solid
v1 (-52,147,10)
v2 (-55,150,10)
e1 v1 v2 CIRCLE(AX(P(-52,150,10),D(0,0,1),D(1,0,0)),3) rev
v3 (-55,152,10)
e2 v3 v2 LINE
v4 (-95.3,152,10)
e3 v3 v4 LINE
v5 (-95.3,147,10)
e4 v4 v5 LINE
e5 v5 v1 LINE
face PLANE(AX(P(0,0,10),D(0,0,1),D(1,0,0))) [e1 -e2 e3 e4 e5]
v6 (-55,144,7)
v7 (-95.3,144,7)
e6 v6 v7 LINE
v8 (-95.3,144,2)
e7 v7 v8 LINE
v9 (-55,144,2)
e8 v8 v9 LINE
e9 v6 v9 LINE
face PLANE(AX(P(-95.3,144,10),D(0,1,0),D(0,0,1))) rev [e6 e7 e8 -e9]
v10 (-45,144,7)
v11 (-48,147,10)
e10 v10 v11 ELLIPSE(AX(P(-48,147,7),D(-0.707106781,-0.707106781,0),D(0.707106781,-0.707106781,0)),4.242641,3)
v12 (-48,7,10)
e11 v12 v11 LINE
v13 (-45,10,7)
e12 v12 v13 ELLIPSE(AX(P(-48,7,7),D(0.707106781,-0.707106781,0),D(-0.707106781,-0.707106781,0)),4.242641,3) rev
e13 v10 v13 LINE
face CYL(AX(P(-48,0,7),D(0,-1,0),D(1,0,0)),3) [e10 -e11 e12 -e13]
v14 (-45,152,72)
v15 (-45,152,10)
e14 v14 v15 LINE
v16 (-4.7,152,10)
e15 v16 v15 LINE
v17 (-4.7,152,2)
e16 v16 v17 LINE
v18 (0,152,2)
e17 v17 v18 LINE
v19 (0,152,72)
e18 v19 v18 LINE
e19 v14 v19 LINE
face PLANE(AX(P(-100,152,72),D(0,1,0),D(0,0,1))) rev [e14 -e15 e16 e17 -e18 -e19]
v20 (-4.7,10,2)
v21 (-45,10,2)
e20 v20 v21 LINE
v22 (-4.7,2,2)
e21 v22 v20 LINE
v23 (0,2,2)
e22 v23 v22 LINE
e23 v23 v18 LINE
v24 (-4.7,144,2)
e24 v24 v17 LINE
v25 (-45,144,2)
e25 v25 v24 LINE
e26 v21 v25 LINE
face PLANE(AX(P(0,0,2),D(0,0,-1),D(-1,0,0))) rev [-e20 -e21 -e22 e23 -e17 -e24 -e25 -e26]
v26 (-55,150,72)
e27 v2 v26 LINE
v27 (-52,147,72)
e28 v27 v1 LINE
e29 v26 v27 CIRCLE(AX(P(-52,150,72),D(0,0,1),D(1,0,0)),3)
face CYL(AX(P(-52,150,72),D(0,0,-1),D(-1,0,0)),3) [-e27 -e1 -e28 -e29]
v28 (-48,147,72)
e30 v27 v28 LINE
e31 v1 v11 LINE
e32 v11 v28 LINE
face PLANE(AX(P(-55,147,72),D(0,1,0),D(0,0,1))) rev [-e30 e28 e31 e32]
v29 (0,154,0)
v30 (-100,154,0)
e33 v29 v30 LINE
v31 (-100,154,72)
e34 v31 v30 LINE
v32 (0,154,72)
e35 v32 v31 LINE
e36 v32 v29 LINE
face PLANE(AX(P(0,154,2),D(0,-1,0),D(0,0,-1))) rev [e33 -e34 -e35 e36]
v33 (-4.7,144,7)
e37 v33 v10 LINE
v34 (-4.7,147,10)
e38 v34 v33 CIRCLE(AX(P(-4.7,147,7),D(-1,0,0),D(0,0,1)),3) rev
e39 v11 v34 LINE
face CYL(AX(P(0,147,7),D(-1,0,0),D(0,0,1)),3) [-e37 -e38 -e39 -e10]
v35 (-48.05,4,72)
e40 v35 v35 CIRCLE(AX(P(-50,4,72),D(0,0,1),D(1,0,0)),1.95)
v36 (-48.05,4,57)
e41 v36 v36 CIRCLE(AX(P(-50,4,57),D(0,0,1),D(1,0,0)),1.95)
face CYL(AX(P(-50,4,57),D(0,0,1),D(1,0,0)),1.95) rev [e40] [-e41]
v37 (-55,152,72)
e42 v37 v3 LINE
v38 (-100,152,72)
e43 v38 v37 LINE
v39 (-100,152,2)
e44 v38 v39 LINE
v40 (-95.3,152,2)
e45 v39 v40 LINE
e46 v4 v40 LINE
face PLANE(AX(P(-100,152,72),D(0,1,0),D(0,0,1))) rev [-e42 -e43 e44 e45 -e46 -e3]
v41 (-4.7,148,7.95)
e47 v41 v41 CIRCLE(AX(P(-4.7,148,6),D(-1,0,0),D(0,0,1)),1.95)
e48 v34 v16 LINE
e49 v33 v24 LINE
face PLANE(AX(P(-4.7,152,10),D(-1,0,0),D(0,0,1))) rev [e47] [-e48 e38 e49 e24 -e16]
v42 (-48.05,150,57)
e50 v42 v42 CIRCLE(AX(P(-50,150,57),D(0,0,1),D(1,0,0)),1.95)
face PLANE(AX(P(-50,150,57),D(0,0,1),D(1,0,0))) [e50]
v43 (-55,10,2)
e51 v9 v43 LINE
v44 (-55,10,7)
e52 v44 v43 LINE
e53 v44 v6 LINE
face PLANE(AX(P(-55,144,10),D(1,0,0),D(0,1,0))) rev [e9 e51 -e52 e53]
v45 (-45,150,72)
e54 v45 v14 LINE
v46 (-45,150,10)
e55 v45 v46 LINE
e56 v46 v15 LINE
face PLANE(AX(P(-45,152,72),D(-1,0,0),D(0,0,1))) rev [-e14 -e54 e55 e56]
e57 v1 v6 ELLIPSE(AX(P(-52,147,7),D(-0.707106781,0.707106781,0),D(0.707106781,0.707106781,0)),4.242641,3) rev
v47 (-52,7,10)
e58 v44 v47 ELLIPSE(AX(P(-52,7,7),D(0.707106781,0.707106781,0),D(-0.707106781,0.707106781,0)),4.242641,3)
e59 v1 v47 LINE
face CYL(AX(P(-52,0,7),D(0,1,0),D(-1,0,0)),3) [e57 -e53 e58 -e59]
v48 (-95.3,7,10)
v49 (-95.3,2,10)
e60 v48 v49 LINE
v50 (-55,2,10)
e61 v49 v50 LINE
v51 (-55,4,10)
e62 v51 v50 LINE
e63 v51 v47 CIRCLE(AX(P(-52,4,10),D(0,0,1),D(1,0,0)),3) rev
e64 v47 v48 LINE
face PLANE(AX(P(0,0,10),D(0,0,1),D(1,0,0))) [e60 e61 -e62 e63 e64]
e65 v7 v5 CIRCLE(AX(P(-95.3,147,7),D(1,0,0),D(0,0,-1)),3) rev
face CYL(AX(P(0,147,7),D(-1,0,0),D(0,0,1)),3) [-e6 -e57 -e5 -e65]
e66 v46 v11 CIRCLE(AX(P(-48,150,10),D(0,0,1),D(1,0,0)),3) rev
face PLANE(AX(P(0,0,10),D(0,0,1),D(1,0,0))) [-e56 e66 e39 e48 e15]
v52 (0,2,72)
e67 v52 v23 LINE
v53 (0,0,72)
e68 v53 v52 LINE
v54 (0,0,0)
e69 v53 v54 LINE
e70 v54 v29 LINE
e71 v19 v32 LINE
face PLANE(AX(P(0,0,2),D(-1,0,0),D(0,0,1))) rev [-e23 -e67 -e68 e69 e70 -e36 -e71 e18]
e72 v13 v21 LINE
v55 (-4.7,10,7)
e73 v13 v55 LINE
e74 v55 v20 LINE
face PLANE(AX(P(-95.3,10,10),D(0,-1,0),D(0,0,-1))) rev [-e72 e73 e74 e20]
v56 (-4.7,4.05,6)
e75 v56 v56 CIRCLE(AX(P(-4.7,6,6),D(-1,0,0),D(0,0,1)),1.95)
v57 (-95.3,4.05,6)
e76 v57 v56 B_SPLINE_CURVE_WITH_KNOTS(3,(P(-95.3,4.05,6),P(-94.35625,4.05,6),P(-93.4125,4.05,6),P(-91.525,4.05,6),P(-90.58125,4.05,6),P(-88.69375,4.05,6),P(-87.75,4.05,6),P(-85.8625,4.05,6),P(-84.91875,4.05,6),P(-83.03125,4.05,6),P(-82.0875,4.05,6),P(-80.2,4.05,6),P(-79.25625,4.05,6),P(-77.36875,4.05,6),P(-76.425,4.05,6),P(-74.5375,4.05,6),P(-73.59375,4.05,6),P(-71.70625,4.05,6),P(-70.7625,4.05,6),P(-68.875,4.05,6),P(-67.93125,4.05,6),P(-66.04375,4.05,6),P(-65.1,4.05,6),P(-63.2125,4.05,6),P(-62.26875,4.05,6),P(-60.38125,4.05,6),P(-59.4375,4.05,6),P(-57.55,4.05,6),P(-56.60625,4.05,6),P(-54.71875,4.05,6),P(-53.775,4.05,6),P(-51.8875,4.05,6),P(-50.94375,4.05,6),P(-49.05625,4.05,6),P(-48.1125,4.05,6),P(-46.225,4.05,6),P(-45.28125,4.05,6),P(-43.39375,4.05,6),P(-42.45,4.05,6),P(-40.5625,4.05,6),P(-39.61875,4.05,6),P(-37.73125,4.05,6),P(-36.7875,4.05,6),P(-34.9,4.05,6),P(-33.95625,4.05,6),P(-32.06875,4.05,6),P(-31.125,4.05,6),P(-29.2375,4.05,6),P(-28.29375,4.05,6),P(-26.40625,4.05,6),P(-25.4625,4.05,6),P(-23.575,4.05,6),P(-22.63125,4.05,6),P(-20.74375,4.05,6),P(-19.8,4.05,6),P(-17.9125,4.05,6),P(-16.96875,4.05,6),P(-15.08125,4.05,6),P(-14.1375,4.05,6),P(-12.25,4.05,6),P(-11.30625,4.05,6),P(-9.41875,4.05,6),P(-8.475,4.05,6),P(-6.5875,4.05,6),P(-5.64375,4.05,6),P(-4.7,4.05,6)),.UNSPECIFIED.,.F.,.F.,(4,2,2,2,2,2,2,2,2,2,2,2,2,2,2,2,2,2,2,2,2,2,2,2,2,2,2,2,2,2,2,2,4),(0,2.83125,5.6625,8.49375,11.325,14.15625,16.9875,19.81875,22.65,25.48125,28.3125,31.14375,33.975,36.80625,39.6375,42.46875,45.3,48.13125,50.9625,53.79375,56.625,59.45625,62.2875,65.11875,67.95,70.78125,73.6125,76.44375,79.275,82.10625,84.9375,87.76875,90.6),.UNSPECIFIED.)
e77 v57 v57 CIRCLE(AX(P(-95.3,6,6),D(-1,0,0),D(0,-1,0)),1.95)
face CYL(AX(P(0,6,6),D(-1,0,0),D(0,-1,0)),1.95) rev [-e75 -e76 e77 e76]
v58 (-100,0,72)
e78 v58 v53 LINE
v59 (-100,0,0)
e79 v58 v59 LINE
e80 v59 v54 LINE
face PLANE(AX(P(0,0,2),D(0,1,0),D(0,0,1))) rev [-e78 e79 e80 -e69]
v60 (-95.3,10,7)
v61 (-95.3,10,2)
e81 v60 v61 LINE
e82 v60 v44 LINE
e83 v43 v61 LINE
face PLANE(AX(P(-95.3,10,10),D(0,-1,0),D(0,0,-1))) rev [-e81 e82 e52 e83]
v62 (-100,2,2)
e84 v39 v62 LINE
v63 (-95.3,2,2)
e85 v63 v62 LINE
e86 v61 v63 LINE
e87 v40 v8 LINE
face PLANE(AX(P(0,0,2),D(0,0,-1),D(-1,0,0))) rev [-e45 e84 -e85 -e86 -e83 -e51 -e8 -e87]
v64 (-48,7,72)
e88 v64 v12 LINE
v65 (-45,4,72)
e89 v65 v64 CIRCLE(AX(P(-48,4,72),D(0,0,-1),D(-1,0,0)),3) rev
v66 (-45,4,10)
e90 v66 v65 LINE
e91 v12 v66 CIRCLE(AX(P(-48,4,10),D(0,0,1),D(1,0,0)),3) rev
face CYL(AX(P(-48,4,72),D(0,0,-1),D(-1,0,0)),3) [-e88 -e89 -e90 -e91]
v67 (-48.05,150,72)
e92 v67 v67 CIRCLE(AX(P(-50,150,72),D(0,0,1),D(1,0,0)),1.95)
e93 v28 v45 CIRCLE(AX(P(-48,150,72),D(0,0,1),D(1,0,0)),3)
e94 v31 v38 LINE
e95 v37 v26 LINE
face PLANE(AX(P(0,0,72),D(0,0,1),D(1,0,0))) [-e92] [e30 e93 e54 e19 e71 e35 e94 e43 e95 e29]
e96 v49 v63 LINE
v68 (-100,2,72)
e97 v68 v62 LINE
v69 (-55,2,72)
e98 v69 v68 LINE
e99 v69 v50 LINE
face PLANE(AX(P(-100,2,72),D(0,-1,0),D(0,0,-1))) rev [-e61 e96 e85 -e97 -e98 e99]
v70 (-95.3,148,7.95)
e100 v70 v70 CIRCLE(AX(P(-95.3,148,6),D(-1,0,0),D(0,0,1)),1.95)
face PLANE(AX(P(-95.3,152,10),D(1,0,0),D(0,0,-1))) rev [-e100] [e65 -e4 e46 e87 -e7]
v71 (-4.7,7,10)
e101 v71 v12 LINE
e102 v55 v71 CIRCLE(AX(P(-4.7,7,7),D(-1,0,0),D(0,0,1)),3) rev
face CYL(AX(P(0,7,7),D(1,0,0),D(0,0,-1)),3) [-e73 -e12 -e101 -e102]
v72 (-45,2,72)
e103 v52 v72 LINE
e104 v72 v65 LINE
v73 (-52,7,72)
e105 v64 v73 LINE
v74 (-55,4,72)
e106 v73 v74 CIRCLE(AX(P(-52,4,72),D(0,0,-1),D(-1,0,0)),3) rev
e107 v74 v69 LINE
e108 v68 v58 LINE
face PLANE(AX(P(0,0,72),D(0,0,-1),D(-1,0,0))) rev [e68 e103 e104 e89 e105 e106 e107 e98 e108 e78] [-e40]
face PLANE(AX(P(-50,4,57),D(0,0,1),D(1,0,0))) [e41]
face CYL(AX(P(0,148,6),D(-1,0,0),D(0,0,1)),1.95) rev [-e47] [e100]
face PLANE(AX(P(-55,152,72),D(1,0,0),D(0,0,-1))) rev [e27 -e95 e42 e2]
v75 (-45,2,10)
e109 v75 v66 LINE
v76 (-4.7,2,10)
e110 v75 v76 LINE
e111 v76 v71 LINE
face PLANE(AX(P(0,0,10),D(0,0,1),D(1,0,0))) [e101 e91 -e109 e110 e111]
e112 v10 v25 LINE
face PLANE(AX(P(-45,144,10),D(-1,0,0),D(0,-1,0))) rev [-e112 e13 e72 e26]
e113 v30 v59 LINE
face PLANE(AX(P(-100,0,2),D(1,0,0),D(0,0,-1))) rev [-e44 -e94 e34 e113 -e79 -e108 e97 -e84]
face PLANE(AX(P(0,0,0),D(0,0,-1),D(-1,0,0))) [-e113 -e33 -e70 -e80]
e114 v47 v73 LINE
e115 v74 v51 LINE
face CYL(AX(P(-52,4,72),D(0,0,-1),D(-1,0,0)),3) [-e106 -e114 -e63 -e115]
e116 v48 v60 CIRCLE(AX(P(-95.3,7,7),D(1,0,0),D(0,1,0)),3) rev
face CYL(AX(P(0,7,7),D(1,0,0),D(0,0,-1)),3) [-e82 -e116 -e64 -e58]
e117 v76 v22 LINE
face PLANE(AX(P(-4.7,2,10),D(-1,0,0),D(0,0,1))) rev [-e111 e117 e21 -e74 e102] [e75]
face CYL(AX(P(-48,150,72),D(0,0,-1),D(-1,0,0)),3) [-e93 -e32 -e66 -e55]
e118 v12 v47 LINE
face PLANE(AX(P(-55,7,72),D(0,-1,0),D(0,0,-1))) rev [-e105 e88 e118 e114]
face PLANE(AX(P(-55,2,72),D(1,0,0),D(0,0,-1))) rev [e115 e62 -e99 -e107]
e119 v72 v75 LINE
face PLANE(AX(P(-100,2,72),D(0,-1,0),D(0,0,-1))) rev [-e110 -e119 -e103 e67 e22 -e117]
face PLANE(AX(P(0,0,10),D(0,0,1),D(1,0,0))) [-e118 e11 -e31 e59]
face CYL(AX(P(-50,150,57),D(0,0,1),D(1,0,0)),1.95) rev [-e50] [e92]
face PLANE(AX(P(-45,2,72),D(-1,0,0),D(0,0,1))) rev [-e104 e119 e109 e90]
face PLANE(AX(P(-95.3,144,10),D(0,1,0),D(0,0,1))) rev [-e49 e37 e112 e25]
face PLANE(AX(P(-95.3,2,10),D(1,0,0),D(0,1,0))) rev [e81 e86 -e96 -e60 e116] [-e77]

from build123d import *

# Parameters (mm, degrees)
SKETCH1_W           = 154
SKETCH1_H           = 100
BOSS_EXTRUDE1_DEPTH = 2
SKETCH2_W           = 100
SKETCH2_H           = 2
BOSS_EXTRUDE2_DEPTH = 70
SKETCH3_W           = 90.6
SKETCH3_H           = 8
BOSS_EXTRUDE3_DEPTH = 8
SKETCH4_W           = 10
SKETCH4_H           = 134
BOSS_EXTRUDE4_DEPTH = 8
SKETCH5_W           = 10
SKETCH5_H           = 5
BOSS_EXTRUDE5_DEPTH = 62
SKETCH6_R           = 1.95
CUT_EXTRUDE1_DEPTH  = 195.889943301
SKETCH7_R           = 1.95
CUT_EXTRUDE2_DEPTH  = 195.889943301
FILLET1_R           = 3
SKETCH8_R           = 1.95
CUT_EXTRUDE3_DEPTH  = 15
SKETCH9_R           = 1.95
CUT_EXTRUDE4_DEPTH  = 15
FILLET2_R           = 3


with BuildPart() as part:
    # Sketch1 → Boss-Extrude1 (new body)
    with BuildSketch(Plane(origin=(0, 0, 0), x_dir=(0, 1, 0), z_dir=(0, 0, 1))):
        with Locations((77, 50)):
            Rectangle(SKETCH1_W, SKETCH1_H)
    extrude(amount=BOSS_EXTRUDE1_DEPTH)

    # Sketch2 → Boss-Extrude2 (add)
    with BuildSketch(Plane.XY.offset(2)):
        with Locations((-50, 153)):
            Rectangle(SKETCH2_W, SKETCH2_H)
        with Locations((-50, 1)):
            Rectangle(SKETCH2_W, SKETCH2_H)
    extrude(amount=BOSS_EXTRUDE2_DEPTH)

    # Sketch3 → Boss-Extrude3 (add)
    with BuildSketch(Plane.XY.offset(2)):
        with Locations((-50, 148)):
            Rectangle(SKETCH3_W, SKETCH3_H)
        with Locations((-50, 6)):
            Rectangle(SKETCH3_W, SKETCH3_H)
    extrude(amount=BOSS_EXTRUDE3_DEPTH)

    # Sketch4 → Boss-Extrude4 (add)
    with BuildSketch(Plane.XY.offset(2)):
        with Locations((-50, 77)):
            Rectangle(SKETCH4_W, SKETCH4_H)
    extrude(amount=BOSS_EXTRUDE4_DEPTH)

    # Sketch5 → Boss-Extrude5 (add)
    with BuildSketch(Plane.XY.offset(10)):
        with Locations((-50, 149.5)):
            Rectangle(SKETCH5_W, SKETCH5_H)
        with Locations((-50, 4.5)):
            Rectangle(SKETCH5_W, SKETCH5_H)
    extrude(amount=BOSS_EXTRUDE5_DEPTH)

    # Sketch6 → Cut-Extrude1 (cut, through all)
    with BuildSketch(Plane(origin=(-95.3, 0, 0), x_dir=(0, -1, 0), z_dir=(-1, 0, 0))):
        with Locations((-6, 6)):
            Circle(SKETCH6_R)
    extrude(amount=-CUT_EXTRUDE1_DEPTH, mode=Mode.SUBTRACT)

    # Sketch7 → Cut-Extrude2 (cut, through all)
    with BuildSketch(Plane(origin=(-95.3, 0, 0), x_dir=(0, -1, 0), z_dir=(-1, 0, 0))):
        with Locations(Location((-148, 6, 0), (0, 0, 90))):
            Circle(SKETCH7_R)
    extrude(amount=-CUT_EXTRUDE2_DEPTH, mode=Mode.SUBTRACT)

    # Fillet1
    fillet1_edges = [part.edges().sort_by_distance(p)[0] for p in [
        (-75.15, 144, 10),
        (-24.85, 10, 10),
        (-75.15, 10, 10),
        (-24.85, 144, 10),
        (-55, 77, 10),
        (-45, 77, 10),
    ]]
    fillet(fillet1_edges, radius=FILLET1_R - 0.0001)  # a hair under: the kernel refuses the full size

    # Sketch8 → Cut-Extrude3 (cut)
    with BuildSketch(Plane.XY.offset(72)):
        with Locations((-50, 150)):
            Circle(SKETCH8_R)
    extrude(amount=-CUT_EXTRUDE3_DEPTH, mode=Mode.SUBTRACT)

    # Sketch9 → Cut-Extrude4 (cut)
    with BuildSketch(Plane.XY.offset(72)):
        with Locations((-50, 4)):
            Circle(SKETCH9_R)
    extrude(amount=-CUT_EXTRUDE4_DEPTH, mode=Mode.SUBTRACT)

    # Fillet2
    fillet2_edges = [part.edges().sort_by_distance(p)[0] for p in [
        (-45, 7, 41),
        (-55, 147, 41),
        (-45, 147, 41),
        (-55, 7, 41),
    ]]
    fillet(fillet2_edges, radius=FILLET2_R)


solid = part.part
